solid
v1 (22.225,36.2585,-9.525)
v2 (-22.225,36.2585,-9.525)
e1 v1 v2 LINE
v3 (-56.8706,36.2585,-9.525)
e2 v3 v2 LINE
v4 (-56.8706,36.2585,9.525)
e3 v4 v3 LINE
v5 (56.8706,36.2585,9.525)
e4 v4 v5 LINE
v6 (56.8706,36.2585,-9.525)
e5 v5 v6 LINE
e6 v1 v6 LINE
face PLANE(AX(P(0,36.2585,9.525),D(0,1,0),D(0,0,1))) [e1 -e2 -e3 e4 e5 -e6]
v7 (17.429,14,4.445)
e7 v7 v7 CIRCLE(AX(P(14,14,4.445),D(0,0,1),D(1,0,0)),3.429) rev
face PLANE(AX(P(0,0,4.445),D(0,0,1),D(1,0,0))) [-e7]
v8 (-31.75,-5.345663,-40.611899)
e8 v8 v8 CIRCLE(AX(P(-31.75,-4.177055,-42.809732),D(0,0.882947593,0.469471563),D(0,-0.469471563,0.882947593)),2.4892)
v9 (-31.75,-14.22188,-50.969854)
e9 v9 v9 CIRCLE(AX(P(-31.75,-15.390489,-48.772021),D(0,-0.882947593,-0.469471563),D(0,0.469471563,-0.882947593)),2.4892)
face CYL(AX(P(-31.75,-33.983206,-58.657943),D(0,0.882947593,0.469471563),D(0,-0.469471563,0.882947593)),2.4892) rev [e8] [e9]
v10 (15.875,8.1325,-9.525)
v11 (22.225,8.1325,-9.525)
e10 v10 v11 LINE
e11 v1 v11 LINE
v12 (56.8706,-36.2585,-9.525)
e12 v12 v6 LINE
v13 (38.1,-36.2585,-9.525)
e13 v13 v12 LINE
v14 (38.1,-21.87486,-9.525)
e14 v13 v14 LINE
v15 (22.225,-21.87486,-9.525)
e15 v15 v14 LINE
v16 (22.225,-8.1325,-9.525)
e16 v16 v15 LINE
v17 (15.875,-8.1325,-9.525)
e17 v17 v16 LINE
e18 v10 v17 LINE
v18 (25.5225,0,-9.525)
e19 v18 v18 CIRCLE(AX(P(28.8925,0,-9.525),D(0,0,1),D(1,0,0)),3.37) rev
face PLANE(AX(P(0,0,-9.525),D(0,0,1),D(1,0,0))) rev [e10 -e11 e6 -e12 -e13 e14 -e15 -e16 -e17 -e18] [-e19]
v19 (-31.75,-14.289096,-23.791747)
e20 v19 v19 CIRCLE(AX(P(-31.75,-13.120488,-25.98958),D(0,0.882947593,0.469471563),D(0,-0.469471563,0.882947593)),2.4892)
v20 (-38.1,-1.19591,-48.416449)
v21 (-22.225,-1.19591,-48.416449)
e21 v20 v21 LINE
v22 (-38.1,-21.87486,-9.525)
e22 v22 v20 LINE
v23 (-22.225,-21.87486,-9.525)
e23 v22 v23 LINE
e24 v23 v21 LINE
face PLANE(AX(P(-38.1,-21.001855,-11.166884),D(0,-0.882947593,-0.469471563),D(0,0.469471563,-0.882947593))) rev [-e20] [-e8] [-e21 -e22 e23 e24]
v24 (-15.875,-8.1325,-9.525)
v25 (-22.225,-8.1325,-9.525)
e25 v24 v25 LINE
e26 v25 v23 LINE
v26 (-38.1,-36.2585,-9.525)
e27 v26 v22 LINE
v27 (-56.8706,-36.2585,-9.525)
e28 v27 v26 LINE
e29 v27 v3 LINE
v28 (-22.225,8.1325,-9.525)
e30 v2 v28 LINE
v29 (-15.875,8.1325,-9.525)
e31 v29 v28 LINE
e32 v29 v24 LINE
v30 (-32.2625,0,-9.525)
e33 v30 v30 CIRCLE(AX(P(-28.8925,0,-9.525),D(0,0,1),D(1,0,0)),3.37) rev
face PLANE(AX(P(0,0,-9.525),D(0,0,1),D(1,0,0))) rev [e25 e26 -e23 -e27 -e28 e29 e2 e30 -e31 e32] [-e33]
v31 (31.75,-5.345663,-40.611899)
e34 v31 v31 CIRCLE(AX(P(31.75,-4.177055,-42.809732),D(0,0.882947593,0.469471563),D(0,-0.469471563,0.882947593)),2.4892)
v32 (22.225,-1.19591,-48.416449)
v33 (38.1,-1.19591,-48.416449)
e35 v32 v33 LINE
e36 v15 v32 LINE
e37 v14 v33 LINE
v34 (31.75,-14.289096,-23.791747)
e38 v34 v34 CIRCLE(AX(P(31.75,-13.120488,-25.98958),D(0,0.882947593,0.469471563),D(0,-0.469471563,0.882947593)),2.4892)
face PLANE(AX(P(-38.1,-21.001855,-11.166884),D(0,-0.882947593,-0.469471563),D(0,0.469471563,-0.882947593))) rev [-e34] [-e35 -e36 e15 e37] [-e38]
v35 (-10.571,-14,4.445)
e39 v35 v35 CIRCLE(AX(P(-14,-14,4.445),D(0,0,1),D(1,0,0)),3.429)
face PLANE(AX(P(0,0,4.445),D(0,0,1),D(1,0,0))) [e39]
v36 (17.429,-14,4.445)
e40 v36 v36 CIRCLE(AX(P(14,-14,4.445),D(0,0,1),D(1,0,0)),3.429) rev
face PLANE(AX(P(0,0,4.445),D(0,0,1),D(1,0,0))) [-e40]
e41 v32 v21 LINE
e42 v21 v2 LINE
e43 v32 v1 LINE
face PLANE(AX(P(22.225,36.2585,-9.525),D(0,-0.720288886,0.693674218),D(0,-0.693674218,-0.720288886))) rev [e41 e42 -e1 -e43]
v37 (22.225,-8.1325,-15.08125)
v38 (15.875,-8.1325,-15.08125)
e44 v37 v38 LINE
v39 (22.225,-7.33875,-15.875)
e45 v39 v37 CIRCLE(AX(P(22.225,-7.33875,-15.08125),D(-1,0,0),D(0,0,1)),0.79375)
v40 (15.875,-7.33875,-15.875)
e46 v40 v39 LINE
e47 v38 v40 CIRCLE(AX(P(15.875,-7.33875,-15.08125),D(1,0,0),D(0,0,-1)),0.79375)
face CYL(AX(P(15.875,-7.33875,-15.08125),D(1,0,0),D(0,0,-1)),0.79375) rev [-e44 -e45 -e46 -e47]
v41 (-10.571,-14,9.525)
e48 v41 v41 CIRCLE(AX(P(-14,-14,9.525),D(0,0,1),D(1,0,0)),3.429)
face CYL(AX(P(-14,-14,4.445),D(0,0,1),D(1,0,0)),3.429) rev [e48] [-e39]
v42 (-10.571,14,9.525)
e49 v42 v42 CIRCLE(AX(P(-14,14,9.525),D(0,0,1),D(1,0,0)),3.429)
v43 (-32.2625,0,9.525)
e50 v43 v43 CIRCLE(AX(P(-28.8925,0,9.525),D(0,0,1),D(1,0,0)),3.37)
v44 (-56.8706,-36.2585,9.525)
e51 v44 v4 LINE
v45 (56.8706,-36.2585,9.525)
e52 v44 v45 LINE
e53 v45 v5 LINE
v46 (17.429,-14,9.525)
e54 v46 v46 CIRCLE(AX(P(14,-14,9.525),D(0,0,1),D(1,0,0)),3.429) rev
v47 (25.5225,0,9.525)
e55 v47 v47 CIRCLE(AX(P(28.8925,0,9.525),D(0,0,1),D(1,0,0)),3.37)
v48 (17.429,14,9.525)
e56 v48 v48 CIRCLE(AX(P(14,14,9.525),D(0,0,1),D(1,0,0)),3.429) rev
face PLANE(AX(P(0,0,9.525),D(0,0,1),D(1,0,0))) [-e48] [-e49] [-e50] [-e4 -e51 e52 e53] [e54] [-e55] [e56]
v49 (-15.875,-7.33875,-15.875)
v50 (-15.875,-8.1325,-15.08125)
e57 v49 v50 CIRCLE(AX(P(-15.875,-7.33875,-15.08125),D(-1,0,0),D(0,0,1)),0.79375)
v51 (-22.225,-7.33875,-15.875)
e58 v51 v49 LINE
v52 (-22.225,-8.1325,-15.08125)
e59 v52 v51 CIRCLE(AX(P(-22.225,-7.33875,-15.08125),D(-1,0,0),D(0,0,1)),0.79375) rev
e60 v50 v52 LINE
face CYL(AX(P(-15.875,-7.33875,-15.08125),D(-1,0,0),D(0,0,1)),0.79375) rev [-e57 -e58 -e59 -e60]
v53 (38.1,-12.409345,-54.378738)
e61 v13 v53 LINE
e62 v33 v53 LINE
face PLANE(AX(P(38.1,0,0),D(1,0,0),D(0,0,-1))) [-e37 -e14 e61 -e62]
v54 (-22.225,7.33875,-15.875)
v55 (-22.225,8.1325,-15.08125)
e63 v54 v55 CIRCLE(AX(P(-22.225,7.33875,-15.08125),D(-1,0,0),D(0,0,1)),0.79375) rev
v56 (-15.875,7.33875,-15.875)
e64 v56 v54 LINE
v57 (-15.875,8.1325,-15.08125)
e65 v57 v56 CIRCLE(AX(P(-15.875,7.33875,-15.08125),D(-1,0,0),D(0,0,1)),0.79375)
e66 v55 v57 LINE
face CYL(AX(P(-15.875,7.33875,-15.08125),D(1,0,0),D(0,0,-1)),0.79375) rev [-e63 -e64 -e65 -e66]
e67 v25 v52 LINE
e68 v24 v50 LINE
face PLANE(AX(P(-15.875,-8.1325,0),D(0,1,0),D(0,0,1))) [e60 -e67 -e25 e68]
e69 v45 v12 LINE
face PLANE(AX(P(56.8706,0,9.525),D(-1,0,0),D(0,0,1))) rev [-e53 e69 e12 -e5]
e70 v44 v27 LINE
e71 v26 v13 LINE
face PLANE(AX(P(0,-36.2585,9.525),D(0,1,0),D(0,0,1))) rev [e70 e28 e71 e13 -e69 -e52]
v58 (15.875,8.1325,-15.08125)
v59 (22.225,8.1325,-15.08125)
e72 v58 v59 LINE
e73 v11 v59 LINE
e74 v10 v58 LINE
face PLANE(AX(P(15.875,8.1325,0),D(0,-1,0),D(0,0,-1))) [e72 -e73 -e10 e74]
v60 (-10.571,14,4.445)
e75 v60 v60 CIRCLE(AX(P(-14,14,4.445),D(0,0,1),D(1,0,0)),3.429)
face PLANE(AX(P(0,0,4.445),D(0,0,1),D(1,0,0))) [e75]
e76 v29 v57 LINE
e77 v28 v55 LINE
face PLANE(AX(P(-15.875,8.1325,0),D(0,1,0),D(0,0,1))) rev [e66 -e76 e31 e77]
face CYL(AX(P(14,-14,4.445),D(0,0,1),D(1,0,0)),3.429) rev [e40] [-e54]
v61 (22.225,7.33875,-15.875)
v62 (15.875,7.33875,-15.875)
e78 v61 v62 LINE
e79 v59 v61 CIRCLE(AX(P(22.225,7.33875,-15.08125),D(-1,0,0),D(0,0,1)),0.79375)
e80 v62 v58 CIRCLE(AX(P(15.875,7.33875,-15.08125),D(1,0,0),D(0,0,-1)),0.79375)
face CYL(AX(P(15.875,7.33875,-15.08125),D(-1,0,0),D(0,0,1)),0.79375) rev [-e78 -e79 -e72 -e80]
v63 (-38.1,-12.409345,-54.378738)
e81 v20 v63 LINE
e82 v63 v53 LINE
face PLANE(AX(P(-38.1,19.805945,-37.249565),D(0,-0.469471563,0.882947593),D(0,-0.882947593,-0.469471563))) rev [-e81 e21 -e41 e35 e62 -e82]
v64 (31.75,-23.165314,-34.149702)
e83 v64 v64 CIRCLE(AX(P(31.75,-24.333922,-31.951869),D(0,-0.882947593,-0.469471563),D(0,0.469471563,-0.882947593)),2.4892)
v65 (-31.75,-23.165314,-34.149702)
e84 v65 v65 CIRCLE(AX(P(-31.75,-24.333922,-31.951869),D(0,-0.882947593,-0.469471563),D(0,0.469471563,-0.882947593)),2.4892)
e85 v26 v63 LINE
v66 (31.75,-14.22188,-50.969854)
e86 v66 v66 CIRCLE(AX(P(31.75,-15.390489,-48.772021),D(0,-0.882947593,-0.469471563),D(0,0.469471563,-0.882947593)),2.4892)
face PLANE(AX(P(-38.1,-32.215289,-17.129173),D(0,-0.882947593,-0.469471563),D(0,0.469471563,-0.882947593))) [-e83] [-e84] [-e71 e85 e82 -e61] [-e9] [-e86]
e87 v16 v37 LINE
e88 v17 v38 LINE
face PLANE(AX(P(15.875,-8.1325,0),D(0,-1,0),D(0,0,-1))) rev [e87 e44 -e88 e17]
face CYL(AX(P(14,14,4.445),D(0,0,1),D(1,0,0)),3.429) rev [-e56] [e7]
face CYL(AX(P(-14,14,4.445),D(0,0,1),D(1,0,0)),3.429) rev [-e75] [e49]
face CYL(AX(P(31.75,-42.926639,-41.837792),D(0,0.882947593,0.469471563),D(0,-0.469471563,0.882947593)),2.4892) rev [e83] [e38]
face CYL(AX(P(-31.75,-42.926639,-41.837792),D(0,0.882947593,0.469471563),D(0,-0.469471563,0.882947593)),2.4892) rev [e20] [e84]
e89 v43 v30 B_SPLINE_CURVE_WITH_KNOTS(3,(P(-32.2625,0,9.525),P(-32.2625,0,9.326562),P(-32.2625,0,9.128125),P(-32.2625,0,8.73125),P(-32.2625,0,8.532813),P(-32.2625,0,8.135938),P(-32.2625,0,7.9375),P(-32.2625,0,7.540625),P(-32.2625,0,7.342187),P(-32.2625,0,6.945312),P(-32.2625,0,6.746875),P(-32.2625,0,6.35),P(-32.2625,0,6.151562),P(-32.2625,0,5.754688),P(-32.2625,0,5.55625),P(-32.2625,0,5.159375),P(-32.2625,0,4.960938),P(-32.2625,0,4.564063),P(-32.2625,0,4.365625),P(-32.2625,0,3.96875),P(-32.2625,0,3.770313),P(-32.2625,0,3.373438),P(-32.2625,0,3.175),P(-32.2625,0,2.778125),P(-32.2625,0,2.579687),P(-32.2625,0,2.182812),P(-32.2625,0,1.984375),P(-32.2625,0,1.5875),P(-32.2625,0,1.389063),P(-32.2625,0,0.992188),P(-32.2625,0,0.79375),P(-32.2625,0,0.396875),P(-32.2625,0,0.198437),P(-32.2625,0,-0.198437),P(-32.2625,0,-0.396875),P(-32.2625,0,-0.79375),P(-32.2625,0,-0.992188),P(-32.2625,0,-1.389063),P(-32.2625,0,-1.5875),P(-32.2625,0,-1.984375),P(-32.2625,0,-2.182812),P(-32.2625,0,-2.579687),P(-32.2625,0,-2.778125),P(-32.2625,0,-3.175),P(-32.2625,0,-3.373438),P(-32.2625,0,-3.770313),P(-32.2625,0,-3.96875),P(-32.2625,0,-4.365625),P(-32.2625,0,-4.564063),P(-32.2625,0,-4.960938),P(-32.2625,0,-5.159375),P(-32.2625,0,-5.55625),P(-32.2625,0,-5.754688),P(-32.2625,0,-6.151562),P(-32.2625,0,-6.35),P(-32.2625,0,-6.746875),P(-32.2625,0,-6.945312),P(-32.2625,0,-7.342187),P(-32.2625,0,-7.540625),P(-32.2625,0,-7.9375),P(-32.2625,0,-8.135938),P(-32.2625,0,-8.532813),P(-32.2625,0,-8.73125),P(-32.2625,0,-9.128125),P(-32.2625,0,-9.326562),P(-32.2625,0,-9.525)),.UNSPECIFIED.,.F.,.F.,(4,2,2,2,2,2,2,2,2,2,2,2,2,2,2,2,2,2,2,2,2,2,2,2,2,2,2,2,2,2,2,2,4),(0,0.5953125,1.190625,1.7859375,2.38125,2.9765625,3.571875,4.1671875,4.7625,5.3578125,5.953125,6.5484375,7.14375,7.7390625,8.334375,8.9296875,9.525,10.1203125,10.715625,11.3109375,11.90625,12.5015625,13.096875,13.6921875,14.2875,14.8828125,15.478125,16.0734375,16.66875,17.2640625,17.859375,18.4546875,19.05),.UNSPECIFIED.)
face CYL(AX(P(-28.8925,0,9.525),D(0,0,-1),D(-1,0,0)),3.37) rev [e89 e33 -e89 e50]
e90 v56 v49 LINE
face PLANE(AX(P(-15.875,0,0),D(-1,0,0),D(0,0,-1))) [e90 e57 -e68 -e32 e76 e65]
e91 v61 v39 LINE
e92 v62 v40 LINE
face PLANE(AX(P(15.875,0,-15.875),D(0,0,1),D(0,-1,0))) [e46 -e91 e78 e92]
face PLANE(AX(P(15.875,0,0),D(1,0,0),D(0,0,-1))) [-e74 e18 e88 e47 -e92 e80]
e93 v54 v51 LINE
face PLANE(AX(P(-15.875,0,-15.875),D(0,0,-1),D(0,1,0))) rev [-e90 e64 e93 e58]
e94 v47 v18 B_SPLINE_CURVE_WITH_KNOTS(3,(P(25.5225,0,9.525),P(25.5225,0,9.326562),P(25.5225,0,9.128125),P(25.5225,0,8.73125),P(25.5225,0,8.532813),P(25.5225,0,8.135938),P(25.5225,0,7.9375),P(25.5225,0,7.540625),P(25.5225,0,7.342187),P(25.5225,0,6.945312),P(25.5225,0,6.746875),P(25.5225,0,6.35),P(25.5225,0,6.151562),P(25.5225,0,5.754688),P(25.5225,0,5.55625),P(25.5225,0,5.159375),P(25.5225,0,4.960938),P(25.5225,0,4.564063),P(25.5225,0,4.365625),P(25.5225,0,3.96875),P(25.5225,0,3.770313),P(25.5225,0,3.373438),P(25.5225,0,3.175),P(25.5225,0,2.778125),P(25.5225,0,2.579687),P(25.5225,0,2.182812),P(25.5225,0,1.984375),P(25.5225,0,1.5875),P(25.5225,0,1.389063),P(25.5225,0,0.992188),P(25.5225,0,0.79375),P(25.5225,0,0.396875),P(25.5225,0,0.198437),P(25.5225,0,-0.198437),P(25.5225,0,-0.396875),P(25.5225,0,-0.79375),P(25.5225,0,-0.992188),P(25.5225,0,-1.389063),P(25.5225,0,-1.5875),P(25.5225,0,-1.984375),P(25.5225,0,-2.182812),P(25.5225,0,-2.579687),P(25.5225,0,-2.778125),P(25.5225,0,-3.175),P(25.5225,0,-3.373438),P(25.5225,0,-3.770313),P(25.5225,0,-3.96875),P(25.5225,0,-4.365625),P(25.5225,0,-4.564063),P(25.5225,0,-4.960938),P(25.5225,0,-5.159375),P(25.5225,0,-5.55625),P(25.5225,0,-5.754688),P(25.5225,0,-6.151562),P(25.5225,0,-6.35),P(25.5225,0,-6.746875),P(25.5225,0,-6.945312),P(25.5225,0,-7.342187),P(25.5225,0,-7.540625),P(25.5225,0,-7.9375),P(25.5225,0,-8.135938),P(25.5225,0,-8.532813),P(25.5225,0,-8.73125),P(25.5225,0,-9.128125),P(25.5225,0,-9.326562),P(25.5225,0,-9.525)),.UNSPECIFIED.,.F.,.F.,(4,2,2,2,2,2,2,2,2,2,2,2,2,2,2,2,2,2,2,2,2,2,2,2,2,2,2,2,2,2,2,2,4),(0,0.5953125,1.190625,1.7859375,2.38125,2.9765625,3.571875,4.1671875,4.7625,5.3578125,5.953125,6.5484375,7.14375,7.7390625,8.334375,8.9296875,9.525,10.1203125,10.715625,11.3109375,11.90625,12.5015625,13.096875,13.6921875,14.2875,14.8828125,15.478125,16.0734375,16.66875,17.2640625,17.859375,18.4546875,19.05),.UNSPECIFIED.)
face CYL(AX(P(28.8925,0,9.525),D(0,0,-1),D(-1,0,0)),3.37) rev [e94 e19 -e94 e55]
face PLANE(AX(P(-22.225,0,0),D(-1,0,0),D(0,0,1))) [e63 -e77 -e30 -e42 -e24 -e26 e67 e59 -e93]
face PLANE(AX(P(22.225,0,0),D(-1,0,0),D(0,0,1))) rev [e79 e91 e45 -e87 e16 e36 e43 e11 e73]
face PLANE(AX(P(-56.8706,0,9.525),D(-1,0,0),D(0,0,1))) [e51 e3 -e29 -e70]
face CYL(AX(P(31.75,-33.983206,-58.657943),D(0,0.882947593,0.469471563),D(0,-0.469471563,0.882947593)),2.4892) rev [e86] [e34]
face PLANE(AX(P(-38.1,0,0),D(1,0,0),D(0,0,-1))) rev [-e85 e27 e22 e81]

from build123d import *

# Parameters (mm, degrees)
SKETCH1_W                      = 113.7412
SKETCH1_H                      = 72.517
BOSS_EXTRUDE1_DEPTH            = 9.525
BOSS_EXTRUDE5_START            = -38.1
BOSS_EXTRUDE5_DEPTH            = 76.2
CUT_EXTRUDE3_REACH             = 88.637
SKETCH1_6_R                    = 3.37
CUT_EXTRUDE3_DIRECTION_2_DEPTH = 87.637123003
BOSS_EXTRUDE6_DEPTH            = 22.225
SKETCH7_R                      = 2.4892
CUT_EXTRUDE4_DEPTH             = 92.543856508
SKETCH8_R                      = 3.429
CUT_EXTRUDE5_DEPTH             = 5.08
CUT_EXTRUDE7_DEPTH             = 6.35
FILLET2_R                      = 0.79375


# Read off the part's stored shape, not the designer's step: Boss-Extrude5
with BuildPart() as part:
    # Sketch1 → Boss-Extrude1 (new, symmetric)
    with BuildSketch(Plane.XY):
        Rectangle(SKETCH1_W, SKETCH1_H)
    extrude(amount=BOSS_EXTRUDE1_DEPTH, both=True)

    # Boss-Extrude5 outline → Boss-Extrude5 (add)
    with BuildSketch(Plane(origin=(0, 0, 0), x_dir=(0, 0, -1), z_dir=(1, 0, 0)).offset(BOSS_EXTRUDE5_START)):
        Polygon((54.378737717, -12.40934461), (48.41644887, -1.195910181), (9.525, -21.874860356), (9.525, -36.2585), align=None)
    extrude(amount=BOSS_EXTRUDE5_DEPTH)

    # Sketch1<6> → Cut-Extrude3 (cut, up to next)
    with BuildSketch(Plane.XY, mode=Mode.PRIVATE) as cut_extrude3_sk1:
        with Locations(Location((-28.8925, 0, 0), (0, 0, 180))):
            Circle(SKETCH1_6_R)
    cut_extrude3_tool1 = extrude(cut_extrude3_sk1.sketch, amount=-CUT_EXTRUDE3_REACH, mode=Mode.PRIVATE) & part.part
    # Sketch1<6> → Cut-Extrude3 (cut, up to next)
    with BuildSketch(Plane.XY, mode=Mode.PRIVATE) as cut_extrude3_sk2:
        with Locations(Location((28.8925, 0, 0), (0, 0, 180))):
            Circle(SKETCH1_6_R)
    cut_extrude3_tool2 = extrude(cut_extrude3_sk2.sketch, amount=-CUT_EXTRUDE3_REACH, mode=Mode.PRIVATE) & part.part
    add(cut_extrude3_tool1.solids().sort_by_distance((-28.8925, 0, 0))[0], mode=Mode.SUBTRACT)
    add(cut_extrude3_tool2.solids().sort_by_distance((28.8925, 0, 0))[0], mode=Mode.SUBTRACT)

    # Sketch1<6> → Cut-Extrude3 direction 2 (cut)
    with BuildSketch(Plane.XY):
        with Locations(Location((-28.8925, 0, 0), (0, 0, 180))):
            Circle(SKETCH1_6_R)
        with Locations(Location((28.8925, 0, 0), (0, 0, 180))):
            Circle(SKETCH1_6_R)
    extrude(amount=CUT_EXTRUDE3_DIRECTION_2_DEPTH, mode=Mode.SUBTRACT)

    # Sketch6 → Boss-Extrude6 (add, symmetric)
    with BuildSketch(Plane(origin=(0, 0, 0), x_dir=(0, 0, -1), z_dir=(1, 0, 0))):
        Polygon((9.525, 36.2585), (9.525, -21.874860356), (48.41644887, -1.195910181), align=None)
    extrude(amount=BOSS_EXTRUDE6_DEPTH, both=True)

    # Sketch7 → Cut-Extrude4 (cut, through all)
    with BuildSketch(Plane(origin=(0, -21.001854955, -11.166884362), x_dir=(1, 0, 0), z_dir=(0, 0.882947592858928, 0.46947156278588875))):
        with Locations(Location((31.75, 35.837741163, 0), (0, 0, 270))):
            Circle(SKETCH7_R)
        with Locations(Location((31.75, 16.787741163, 0), (0, 0, 270))):
            Circle(SKETCH7_R)
        with Locations(Location((-31.75, 35.837741163, 0), (0, 0, 270))):
            Circle(SKETCH7_R)
        with Locations(Location((-31.75, 16.787741163, 0), (0, 0, 270))):
            Circle(SKETCH7_R)
    extrude(amount=-CUT_EXTRUDE4_DEPTH, mode=Mode.SUBTRACT)

    # Sketch8 → Cut-Extrude5 (cut)
    with BuildSketch(Plane.XY.offset(9.525)):
        with Locations((-14, 14)):
            Circle(SKETCH8_R)
        with Locations((14, 14)):
            Circle(SKETCH8_R)
        with Locations((-14, -14)):
            Circle(SKETCH8_R)
        with Locations((14, -14)):
            Circle(SKETCH8_R)
    extrude(amount=-CUT_EXTRUDE5_DEPTH, mode=Mode.SUBTRACT)

    # Sketch11 → Cut-Extrude7 (cut)
    with BuildSketch(Plane(origin=(22.225, 0, 0), x_dir=(0, 0, -1), z_dir=(1, 0, 0))):
        Polygon((9.525, 3.37), (9.525, -3.37), (9.525, -8.1325), (15.875, -8.1325), (15.875, 8.1325), (9.525, 8.1325), align=None)
    cut_extrude7 = extrude(amount=-CUT_EXTRUDE7_DEPTH, mode=Mode.SUBTRACT)

    # Mirror1: Cut-Extrude7 across plane
    add(cut_extrude7.mirror(Plane(origin=(0, 0, 0), x_dir=(0, 0, 1), z_dir=(1, 0, 0))), mode=Mode.SUBTRACT)

    # Fillet2
    fillet2_edges = [part.edges().sort_by_distance(p)[0] for p in [
        (19.05, 8.1325, -15.875),
        (19.05, -8.1325, -15.875),
        (-19.05, -8.1325, -15.875),
        (-19.05, 8.1325, -15.875),
    ]]
    fillet(fillet2_edges, radius=FILLET2_R)


solid = part.part
